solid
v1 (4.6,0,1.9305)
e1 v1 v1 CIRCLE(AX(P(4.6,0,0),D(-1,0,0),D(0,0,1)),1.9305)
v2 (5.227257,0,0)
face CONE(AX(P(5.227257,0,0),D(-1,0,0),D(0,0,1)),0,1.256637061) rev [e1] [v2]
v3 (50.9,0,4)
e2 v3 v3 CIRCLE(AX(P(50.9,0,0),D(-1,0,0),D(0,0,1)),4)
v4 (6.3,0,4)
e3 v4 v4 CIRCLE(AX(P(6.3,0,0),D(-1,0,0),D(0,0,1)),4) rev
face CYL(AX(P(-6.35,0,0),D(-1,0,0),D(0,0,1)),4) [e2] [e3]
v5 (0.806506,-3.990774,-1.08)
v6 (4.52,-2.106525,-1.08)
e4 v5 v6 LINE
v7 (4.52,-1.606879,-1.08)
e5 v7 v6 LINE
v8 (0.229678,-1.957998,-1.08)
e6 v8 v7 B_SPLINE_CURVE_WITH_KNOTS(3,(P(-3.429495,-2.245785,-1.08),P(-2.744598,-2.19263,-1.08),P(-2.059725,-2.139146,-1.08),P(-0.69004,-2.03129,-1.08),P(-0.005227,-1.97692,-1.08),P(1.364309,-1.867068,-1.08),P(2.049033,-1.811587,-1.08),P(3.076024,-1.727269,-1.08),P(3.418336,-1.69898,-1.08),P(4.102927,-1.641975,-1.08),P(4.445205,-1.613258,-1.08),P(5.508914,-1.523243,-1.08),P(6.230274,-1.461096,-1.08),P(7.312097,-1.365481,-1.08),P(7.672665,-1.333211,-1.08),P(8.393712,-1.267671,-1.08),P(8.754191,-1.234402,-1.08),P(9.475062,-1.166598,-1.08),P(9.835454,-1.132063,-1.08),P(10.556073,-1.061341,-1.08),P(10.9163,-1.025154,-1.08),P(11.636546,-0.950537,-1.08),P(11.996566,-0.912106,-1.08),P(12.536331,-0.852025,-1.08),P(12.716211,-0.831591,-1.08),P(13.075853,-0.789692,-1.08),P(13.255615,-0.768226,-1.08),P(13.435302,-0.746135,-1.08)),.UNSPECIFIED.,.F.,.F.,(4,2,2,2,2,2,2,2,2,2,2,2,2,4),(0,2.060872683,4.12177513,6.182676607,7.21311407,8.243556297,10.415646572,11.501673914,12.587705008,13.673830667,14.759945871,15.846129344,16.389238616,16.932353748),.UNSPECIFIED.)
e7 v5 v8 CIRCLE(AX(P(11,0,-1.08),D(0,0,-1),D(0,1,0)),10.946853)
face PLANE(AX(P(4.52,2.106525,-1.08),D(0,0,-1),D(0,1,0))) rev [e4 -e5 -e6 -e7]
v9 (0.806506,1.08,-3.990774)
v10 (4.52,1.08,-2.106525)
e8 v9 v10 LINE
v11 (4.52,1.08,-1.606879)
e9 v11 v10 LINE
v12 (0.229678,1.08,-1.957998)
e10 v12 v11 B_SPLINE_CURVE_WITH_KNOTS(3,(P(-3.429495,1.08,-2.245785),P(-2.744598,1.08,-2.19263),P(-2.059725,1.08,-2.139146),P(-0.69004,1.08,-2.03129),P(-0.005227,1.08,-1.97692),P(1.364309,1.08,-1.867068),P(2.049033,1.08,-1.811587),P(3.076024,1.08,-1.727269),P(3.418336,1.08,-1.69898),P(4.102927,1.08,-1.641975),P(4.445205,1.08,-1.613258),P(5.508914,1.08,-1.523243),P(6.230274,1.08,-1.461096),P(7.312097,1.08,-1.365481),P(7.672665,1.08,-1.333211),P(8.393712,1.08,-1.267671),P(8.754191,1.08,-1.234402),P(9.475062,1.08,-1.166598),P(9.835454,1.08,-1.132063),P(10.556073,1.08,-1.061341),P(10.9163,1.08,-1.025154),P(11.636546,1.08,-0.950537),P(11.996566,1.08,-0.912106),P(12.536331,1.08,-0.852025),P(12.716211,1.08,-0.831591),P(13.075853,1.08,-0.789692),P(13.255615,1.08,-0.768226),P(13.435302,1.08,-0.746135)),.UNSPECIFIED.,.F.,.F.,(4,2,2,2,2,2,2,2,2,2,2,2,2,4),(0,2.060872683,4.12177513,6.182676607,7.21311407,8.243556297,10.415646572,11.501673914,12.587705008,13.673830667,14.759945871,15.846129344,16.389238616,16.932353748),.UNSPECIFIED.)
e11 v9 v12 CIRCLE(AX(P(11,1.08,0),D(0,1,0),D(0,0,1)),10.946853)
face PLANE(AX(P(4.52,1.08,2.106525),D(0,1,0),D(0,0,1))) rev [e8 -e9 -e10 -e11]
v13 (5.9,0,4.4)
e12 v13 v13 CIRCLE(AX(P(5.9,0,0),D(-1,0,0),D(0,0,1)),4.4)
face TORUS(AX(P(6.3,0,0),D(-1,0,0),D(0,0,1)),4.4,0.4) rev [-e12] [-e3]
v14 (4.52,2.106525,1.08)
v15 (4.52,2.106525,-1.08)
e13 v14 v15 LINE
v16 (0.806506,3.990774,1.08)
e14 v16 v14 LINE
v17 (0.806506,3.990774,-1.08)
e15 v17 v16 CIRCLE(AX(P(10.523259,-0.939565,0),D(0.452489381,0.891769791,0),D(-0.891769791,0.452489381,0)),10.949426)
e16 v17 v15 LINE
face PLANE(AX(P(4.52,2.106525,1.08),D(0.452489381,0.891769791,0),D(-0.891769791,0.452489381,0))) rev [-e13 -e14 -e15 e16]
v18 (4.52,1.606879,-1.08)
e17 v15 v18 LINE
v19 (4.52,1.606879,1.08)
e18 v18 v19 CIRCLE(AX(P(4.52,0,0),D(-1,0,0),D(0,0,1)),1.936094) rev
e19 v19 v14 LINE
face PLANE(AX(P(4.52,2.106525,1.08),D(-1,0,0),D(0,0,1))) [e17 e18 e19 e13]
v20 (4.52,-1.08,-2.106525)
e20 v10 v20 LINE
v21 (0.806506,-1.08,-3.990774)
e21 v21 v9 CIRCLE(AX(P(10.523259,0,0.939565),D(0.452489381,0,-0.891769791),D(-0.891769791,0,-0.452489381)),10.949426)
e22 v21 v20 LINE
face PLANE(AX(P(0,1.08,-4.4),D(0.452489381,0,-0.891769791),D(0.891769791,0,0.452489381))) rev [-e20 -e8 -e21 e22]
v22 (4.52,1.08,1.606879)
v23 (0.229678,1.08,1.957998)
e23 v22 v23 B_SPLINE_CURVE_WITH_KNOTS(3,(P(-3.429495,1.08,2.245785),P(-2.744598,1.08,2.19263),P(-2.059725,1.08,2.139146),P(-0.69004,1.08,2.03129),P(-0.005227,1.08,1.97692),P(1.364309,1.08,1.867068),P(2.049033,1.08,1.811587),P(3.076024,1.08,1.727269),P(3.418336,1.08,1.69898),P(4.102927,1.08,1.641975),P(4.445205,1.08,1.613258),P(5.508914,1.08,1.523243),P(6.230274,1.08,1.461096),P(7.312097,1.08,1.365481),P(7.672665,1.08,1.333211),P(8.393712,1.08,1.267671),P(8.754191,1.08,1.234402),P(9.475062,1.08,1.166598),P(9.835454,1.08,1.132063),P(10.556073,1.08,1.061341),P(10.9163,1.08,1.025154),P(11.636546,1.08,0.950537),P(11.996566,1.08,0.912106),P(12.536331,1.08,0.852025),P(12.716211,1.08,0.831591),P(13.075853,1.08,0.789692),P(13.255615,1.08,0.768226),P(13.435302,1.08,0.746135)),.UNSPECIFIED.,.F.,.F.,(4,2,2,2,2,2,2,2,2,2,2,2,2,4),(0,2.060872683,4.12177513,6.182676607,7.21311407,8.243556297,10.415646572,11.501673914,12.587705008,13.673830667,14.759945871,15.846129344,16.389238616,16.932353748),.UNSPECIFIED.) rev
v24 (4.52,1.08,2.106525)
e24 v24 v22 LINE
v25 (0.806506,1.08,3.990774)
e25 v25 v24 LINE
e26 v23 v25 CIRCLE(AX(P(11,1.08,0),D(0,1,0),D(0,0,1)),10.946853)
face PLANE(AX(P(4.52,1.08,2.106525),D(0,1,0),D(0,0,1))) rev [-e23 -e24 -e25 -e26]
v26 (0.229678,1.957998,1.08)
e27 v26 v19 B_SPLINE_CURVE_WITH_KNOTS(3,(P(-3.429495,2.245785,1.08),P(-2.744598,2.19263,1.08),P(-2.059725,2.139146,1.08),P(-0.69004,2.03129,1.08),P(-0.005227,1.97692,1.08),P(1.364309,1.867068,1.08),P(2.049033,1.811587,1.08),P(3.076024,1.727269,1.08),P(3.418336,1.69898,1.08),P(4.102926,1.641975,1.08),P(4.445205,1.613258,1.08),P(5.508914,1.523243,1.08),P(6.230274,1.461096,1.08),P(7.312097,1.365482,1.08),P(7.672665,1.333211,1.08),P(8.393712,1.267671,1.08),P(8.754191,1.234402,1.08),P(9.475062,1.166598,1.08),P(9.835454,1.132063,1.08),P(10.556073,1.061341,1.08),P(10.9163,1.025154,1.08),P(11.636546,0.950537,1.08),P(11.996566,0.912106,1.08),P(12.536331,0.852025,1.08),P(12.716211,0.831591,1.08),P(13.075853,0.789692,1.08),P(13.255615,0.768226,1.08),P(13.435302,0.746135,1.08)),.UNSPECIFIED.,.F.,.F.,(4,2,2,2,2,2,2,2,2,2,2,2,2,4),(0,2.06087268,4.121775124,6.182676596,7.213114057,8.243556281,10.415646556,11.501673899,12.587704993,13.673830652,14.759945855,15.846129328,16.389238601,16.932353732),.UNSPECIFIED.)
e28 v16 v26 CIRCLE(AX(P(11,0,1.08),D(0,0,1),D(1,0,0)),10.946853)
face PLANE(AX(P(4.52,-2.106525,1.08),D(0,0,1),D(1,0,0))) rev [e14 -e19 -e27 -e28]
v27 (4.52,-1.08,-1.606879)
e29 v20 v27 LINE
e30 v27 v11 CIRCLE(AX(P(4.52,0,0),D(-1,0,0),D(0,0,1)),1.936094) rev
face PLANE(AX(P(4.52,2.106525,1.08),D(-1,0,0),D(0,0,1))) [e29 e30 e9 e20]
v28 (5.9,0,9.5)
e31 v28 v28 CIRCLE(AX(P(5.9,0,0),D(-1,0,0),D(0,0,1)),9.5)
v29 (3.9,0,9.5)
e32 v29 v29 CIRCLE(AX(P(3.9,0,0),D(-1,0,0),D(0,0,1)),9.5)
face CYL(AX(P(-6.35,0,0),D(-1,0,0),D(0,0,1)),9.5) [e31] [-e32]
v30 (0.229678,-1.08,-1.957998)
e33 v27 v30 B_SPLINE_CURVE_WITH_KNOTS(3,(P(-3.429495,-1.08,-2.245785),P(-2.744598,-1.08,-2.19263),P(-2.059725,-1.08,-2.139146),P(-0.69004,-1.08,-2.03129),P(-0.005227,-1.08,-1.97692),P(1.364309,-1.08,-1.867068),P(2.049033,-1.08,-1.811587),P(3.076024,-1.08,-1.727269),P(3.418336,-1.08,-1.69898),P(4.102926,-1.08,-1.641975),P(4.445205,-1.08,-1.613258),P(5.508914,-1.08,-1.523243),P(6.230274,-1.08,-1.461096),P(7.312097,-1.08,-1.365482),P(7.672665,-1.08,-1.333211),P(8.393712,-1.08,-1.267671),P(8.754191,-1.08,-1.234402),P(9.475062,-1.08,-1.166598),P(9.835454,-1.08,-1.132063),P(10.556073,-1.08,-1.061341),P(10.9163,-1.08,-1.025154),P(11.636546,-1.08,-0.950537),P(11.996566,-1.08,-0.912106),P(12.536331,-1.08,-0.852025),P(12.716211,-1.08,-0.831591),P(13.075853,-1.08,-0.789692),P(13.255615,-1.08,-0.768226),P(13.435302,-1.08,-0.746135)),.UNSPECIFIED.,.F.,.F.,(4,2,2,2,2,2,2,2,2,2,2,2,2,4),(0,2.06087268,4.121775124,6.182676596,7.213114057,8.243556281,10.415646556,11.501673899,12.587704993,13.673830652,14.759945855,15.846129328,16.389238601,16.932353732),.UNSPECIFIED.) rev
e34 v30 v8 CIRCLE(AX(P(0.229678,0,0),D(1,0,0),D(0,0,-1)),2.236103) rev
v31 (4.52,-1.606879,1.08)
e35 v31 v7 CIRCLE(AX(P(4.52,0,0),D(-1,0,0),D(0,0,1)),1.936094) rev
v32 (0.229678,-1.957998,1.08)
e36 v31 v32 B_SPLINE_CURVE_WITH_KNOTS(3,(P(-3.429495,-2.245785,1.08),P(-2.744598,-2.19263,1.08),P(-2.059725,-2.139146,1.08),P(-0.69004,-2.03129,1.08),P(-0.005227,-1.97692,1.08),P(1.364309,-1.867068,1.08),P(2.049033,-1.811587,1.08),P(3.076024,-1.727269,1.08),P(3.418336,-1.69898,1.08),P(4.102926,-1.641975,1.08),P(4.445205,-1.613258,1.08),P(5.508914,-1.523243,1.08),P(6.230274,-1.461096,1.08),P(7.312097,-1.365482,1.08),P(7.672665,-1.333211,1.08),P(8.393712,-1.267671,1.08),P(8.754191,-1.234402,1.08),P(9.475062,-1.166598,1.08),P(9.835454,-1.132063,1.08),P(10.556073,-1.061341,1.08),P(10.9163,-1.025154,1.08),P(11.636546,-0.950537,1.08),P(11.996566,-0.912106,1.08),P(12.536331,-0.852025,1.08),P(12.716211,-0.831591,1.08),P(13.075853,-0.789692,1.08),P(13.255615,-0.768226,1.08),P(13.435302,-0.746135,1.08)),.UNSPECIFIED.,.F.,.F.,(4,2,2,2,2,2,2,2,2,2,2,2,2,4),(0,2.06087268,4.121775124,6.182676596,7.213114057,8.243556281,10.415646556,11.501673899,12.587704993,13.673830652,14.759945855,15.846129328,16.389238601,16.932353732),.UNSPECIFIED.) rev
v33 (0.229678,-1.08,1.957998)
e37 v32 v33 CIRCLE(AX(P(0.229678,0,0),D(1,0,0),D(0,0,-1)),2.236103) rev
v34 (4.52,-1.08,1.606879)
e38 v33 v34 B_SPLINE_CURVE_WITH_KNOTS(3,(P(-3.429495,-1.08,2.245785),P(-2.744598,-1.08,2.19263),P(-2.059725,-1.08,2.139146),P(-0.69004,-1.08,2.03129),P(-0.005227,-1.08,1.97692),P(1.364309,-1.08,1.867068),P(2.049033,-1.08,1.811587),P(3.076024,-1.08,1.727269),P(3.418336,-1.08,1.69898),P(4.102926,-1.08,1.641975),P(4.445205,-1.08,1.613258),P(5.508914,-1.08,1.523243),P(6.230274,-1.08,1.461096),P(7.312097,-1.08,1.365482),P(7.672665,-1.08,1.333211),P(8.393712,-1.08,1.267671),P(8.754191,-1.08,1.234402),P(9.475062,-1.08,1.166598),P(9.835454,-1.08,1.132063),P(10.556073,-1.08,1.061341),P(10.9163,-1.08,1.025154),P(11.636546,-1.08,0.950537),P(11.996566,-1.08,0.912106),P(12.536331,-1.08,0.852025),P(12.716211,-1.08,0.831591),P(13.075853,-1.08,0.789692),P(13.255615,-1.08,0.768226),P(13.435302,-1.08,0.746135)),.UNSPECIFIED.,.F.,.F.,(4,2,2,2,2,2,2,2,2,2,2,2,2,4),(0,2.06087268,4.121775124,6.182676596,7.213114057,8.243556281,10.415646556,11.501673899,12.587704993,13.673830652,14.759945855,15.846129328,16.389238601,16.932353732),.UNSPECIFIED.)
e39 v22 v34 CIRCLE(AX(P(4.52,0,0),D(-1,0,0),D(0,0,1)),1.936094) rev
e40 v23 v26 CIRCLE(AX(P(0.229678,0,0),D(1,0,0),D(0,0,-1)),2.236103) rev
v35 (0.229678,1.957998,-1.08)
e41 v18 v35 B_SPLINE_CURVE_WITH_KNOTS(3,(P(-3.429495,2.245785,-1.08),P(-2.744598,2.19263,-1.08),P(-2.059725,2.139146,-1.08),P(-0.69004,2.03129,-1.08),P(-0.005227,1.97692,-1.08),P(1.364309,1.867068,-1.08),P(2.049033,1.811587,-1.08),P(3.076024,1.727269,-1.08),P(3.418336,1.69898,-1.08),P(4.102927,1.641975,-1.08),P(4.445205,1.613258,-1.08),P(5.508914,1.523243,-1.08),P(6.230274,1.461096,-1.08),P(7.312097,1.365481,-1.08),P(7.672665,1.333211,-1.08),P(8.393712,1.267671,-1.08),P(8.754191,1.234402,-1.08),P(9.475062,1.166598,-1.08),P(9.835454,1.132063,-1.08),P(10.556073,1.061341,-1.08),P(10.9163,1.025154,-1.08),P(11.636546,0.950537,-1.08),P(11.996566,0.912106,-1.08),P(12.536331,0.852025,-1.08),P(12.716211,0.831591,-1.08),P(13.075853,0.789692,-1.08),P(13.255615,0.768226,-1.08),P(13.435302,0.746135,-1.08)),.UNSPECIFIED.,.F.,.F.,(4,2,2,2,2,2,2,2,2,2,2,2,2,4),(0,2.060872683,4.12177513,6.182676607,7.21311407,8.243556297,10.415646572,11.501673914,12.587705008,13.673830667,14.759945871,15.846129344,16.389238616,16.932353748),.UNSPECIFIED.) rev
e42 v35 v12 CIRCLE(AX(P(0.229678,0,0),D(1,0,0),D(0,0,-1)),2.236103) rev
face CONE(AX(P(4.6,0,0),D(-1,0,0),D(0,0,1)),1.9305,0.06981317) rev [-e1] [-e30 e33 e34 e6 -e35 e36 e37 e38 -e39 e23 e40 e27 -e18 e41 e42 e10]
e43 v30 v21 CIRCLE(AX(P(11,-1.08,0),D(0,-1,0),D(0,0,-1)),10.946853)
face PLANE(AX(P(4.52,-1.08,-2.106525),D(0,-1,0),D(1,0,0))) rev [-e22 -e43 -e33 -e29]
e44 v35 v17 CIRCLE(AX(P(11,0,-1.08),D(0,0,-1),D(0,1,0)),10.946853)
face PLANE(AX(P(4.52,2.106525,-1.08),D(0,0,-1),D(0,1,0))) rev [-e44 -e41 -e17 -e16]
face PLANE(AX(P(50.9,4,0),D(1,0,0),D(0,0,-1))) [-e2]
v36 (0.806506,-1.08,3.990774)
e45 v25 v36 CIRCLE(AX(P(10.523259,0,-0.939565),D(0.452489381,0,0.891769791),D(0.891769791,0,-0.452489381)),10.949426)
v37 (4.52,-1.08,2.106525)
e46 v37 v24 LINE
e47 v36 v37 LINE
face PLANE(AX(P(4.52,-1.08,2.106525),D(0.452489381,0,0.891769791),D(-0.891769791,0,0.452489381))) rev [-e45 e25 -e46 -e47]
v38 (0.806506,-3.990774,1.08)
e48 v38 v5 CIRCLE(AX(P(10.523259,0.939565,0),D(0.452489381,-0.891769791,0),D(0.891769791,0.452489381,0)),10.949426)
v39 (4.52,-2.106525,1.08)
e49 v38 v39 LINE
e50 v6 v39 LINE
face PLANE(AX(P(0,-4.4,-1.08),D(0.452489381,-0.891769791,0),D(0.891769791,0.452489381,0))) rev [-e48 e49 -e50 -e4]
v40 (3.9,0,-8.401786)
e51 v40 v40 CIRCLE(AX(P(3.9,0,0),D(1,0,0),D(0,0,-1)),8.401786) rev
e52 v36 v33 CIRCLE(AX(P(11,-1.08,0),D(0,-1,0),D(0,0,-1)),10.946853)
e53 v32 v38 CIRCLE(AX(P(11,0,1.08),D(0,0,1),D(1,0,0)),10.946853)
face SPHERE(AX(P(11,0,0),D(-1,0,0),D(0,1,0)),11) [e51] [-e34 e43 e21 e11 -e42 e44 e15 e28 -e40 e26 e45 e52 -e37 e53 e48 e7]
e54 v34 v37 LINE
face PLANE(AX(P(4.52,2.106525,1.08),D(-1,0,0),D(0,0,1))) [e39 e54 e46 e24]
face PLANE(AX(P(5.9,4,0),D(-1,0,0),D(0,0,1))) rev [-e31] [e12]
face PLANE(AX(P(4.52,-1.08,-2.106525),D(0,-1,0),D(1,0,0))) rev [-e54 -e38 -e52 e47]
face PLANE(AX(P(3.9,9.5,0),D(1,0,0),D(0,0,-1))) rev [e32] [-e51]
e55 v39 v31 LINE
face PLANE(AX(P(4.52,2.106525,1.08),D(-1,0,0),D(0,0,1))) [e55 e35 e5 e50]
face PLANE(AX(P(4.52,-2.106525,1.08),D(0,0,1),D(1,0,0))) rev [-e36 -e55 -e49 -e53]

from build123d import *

# Parameters (mm, degrees)
FILLET1_R    = 0.4
RECPAT_COUNT = 2
RECPAT_ANGLE = 90


with BuildPart() as part:
    # BodySke → Base-Revolve (revolve)
    with BuildSketch(Plane.XY):
        Polygon((5.9, 4), (5.9, 9.5), (3.9, 9.5), (3.9, 0), (50.9, 0), (50.9, 4), align=None)
    revolve(axis=Axis((-6.35, 0, 0), (1, 0, 0)))

    # Fillet1
    fillet1_edges = [part.edges().sort_by_distance(p)[0] for p in [
        (5.9, -4, 0),
    ]]
    fillet(fillet1_edges, radius=FILLET1_R)

    # PanSke → Pan (revolve)
    with BuildSketch(Plane.XY):
        with BuildLine():
            Line((3.9, 8.401785525), (3.9, 0))
            Line((3.9, 0), (0, 0))
            ThreePointArc((0, 0), (1.02252537, 4.631414471), (3.9, 8.401785525))
        make_face()
    revolve(axis=Axis((0, 0, 0), (1, 0, 0)))

    # Sketch3 → Recess section 0
    with BuildSketch(Plane(origin=(0, 0, 0), x_dir=(0, 0, -1), z_dir=(1, 0, 0))):
        with BuildLine():
            Line((-1.08, 4.4), (1.08, 4.4))
            Line((1.08, 4.4), (1.08, -4.4))
            Line((1.08, -4.4), (-1.08, -4.4))
            Line((-1.08, -4.4), (-1.08, 4.4))
        make_face()
    # Sketch4 → Recess section 1
    with BuildSketch(Plane(origin=(4.52, 0, 0), x_dir=(0, 0, -1), z_dir=(1, 0, 0))):
        with BuildLine():
            Line((-1.08, 2.106524682), (1.08, 2.106524682))
            Line((1.08, 2.106524682), (1.08, -2.106524682))
            Line((1.08, -2.106524682), (-1.08, -2.106524682))
            Line((-1.08, -2.106524682), (-1.08, 2.106524682))
        make_face()
    recess = loft(mode=Mode.SUBTRACT)

    # RecPat: Recess ×2 about axis
    recpat_axis = Axis((0, 0, 0), (1, 0, 0))
    for i in range(1, RECPAT_COUNT):
        add(recess.rotate(recpat_axis, i * RECPAT_ANGLE / (RECPAT_COUNT - 1)), mode=Mode.SUBTRACT)

    # RecCorSke → RecessCore (revolve, cut)
    with BuildSketch(Plane.XY):
        Polygon((0, 0), (0, 2.252163335), (4.6, 1.9305), (5.227257474, 0), align=None)
    revolve(axis=Axis((-3.175, 0, 0), (1, 0, 0)), mode=Mode.SUBTRACT)


solid = part.part
